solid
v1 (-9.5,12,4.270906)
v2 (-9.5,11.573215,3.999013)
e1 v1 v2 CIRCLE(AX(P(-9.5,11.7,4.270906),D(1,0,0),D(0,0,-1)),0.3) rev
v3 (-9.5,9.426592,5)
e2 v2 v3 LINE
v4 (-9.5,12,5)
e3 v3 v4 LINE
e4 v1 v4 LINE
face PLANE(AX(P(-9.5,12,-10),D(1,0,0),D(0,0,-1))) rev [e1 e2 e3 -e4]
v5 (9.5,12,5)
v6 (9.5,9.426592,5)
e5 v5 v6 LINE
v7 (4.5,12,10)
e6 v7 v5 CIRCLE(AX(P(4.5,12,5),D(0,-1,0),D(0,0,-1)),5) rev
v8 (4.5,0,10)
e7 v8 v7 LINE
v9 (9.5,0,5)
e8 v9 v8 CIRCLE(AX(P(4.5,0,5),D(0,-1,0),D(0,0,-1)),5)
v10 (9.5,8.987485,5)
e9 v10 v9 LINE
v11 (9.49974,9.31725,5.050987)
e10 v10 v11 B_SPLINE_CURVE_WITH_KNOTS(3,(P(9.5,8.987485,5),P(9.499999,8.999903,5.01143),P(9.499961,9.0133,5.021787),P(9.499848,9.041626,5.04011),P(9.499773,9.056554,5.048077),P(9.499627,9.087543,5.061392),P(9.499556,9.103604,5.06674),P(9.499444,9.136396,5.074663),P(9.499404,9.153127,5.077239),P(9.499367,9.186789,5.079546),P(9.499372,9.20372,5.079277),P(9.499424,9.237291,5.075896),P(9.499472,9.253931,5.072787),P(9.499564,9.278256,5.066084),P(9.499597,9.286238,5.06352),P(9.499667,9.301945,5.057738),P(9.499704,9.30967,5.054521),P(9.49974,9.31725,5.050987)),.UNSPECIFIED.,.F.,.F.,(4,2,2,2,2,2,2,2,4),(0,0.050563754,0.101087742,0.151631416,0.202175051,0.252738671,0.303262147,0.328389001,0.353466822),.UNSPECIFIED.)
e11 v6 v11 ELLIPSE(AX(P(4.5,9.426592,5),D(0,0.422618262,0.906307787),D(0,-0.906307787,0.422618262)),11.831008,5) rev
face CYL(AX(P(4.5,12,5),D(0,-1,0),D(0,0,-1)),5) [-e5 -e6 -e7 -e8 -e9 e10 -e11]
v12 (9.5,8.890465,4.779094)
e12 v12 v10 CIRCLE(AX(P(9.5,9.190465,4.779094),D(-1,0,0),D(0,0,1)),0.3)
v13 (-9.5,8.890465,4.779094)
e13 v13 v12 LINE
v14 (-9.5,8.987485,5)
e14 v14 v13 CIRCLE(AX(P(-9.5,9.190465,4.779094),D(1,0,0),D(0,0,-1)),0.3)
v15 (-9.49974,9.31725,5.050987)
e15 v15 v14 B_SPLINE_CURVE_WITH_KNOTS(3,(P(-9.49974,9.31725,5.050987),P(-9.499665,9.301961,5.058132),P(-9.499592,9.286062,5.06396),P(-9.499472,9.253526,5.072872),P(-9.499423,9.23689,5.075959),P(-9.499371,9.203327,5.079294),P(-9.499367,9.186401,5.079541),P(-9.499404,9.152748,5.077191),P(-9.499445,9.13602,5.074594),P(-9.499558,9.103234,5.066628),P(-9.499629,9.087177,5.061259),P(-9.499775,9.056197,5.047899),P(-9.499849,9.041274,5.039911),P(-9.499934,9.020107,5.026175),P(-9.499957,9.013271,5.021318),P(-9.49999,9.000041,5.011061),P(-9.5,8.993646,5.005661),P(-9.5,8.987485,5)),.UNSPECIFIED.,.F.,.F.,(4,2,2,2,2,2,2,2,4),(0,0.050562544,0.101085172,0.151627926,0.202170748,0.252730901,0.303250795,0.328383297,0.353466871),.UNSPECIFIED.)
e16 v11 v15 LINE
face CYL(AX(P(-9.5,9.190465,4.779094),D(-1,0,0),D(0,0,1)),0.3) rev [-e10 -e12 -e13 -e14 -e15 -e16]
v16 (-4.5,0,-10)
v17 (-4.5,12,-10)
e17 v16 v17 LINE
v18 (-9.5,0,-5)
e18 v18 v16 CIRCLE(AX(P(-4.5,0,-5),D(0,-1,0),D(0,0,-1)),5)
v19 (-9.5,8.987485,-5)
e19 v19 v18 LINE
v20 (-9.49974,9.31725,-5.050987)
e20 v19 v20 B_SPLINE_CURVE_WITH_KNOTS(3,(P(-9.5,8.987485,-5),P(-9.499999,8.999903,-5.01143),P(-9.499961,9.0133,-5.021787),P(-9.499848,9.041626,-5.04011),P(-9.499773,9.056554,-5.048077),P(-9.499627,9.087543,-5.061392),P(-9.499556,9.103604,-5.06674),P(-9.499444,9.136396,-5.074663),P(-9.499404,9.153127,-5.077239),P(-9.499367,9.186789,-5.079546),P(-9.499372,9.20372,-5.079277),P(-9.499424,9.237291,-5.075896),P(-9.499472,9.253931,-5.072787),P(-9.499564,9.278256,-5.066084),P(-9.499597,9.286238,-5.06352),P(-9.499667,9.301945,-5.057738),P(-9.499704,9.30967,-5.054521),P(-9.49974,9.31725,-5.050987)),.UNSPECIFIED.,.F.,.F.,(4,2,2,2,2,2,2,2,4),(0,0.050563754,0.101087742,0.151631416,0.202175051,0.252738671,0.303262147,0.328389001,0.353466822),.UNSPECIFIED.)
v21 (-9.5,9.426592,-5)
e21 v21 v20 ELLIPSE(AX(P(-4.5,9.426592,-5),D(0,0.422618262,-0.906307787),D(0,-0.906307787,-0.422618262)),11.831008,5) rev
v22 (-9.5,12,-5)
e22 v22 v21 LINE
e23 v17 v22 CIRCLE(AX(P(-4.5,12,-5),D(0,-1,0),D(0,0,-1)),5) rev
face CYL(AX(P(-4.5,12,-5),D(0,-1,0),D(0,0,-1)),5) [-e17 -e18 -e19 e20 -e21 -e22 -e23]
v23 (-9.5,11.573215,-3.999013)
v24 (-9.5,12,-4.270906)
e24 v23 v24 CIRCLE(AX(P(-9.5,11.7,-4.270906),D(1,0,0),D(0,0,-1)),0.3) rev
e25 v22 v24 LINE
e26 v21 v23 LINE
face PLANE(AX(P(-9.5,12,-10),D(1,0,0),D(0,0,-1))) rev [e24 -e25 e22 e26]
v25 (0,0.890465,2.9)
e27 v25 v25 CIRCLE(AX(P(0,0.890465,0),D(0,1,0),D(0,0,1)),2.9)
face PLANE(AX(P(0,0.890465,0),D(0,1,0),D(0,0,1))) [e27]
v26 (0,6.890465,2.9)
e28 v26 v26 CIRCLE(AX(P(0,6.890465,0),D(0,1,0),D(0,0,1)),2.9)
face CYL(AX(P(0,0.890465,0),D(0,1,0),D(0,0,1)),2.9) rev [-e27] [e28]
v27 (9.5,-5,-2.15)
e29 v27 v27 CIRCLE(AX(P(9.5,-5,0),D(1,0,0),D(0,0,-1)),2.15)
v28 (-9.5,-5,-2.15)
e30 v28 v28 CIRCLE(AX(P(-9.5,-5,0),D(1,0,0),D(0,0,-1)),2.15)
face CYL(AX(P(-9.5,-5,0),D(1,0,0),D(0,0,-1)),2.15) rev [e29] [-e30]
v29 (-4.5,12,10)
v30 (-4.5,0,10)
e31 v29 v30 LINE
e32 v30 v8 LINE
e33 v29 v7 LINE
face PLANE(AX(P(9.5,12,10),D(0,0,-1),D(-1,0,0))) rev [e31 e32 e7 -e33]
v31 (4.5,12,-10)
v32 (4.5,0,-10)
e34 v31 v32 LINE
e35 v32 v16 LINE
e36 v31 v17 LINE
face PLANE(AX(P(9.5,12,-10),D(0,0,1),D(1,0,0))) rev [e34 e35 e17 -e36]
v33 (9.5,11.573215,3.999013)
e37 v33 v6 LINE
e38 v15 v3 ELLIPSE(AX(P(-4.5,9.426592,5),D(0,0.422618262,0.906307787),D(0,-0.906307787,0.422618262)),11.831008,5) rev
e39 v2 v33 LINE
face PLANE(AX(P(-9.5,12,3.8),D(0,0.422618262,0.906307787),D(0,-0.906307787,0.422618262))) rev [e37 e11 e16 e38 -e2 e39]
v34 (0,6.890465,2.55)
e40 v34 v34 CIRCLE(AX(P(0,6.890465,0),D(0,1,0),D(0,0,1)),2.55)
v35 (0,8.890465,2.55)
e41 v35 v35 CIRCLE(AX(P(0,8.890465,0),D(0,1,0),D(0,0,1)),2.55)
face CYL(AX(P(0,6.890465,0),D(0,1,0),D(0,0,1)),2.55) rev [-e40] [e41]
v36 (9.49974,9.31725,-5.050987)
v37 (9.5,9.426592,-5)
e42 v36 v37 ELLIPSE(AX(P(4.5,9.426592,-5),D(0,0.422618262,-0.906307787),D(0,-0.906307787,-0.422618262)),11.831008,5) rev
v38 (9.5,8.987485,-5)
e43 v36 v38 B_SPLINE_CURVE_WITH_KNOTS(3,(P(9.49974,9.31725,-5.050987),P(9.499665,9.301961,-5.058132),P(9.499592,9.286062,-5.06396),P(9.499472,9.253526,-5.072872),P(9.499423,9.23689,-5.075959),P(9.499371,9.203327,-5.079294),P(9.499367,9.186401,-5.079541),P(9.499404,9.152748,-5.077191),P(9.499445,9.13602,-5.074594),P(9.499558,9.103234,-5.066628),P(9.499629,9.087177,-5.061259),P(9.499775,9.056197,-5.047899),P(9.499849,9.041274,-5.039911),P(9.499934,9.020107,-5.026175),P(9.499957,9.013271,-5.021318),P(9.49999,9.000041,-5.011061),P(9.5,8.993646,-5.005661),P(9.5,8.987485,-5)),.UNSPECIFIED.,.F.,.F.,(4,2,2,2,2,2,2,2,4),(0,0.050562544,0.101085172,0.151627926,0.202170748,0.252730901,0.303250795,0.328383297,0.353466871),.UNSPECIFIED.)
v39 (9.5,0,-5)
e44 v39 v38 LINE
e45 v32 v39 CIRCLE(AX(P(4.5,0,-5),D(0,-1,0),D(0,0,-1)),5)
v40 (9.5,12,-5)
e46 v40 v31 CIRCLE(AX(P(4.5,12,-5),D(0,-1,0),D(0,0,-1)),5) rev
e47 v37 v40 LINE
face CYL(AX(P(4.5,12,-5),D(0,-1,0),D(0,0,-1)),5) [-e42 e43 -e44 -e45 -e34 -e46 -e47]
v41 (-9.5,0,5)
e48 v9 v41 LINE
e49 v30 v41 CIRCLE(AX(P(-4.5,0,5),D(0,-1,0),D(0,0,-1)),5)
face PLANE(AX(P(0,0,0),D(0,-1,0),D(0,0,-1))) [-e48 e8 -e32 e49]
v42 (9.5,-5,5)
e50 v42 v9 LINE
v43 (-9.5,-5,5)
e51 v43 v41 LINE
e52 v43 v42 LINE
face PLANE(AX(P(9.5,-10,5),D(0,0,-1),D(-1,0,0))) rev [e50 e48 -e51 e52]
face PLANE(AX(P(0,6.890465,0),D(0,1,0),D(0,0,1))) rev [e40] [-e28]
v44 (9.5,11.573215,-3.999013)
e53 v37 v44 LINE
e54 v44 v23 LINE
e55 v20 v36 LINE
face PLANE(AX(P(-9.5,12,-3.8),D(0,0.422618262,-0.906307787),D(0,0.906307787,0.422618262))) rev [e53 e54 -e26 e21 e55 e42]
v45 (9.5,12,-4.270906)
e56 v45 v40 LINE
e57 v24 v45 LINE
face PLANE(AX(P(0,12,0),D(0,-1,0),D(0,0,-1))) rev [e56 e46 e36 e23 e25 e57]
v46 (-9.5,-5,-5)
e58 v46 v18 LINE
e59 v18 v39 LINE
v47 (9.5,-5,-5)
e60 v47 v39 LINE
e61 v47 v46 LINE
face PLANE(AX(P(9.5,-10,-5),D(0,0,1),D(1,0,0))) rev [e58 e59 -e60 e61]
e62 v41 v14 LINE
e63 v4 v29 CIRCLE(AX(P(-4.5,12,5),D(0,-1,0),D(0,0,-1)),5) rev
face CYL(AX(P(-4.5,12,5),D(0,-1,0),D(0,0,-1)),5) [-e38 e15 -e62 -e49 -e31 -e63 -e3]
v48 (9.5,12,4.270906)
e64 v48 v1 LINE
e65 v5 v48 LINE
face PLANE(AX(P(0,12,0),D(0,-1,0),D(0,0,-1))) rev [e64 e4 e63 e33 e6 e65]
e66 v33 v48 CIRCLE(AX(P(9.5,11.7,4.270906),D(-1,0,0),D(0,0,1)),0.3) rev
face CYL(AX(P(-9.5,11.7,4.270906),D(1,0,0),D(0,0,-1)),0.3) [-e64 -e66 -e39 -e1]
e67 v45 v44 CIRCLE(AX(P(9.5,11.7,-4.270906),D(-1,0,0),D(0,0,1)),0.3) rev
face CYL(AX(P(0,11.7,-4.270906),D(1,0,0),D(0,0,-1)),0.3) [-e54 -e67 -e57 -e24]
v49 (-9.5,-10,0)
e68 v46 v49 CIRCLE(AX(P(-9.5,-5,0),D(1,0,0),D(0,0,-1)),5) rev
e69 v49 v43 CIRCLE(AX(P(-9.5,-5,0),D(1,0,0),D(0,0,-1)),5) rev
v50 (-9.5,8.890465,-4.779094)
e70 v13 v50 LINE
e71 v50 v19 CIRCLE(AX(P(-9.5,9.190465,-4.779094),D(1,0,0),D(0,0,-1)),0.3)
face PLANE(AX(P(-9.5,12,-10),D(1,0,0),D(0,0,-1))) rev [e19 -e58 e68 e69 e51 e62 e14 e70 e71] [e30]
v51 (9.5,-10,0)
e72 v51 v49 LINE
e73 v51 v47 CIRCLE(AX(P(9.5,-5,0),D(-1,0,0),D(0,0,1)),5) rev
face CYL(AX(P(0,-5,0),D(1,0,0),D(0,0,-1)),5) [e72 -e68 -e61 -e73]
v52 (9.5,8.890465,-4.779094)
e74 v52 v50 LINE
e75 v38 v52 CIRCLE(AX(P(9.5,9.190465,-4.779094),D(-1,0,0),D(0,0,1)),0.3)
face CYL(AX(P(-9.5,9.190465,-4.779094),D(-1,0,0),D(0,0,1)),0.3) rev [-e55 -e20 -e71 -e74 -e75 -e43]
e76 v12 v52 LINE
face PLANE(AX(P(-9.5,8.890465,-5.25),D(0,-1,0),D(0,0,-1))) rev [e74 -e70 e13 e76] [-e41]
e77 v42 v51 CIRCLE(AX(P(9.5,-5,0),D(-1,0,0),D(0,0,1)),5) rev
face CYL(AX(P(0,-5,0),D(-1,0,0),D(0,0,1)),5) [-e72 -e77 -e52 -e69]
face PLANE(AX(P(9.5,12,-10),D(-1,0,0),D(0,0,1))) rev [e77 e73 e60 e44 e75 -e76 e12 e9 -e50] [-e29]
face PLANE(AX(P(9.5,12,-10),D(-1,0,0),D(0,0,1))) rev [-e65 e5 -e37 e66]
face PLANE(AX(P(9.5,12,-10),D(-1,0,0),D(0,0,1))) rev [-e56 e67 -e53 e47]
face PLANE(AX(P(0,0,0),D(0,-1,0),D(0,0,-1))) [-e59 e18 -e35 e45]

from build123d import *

# Parameters (mm, degrees)
SKETCH2_W           = 19
SKETCH2_H           = 20
BOSS_EXTRUDE1_DEPTH = 12
CUT_EXTRUDE1_DEPTH  = 25.596747752
FILLET1_R           = 5
FILLET2_R           = 0.3
SKETCH4_R           = 2.55
CUT_EXTRUDE2_DEPTH  = 2
SKETCH5_R           = 2.9
CUT_EXTRUDE3_DEPTH  = 6
SKETCH6_W           = 19
SKETCH6_H           = 10
BOSS_EXTRUDE2_DEPTH = 10
SKETCH7_R           = 2.15
CUT_EXTRUDE4_DEPTH  = 25.596747919
FILLET3_R           = 5


# Some blends are built 0.0001 mm under size
with BuildPart() as part:
    # Sketch2 → Boss-Extrude1 (new body)
    with BuildSketch(Plane(origin=(0, 0, 0), x_dir=(1, 0, 0), z_dir=(0, 1, 0))):
        Rectangle(SKETCH2_W, SKETCH2_H)
    extrude(amount=BOSS_EXTRUDE1_DEPTH)

    # Sketch3 → Cut-Extrude1 (cut, through all)
    with BuildSketch(Plane(origin=(9.5, 0, 0), x_dir=(0, 0, -1), z_dir=(1, 0, 0))):
        Polygon((-3.8, 12), (3.8, 12), (5.25, 8.890464965), (-5.25, 8.890464965), align=None)
    extrude(amount=-CUT_EXTRUDE1_DEPTH, mode=Mode.SUBTRACT)

    # Fillet1
    # the kernel refuses this fillet: 5 mm, written as the material it takes off along each edge
    with BuildSketch(Plane(origin=(-9.5, -12.5, -10), x_dir=(1, 0, 0), z_dir=(0, 1, 0)), Plane(origin=(-9.5, -12.5, 10), x_dir=(0, 0, -1), z_dir=(0, 1, 0))) as fillet1_piece_1:
        with BuildLine():
            CenterArc((FILLET1_R, -FILLET1_R), FILLET1_R, 90, 90)
            Line((0, -FILLET1_R), (0, 0))
            Line((0, 0), (FILLET1_R, 0))
        make_face()
    extrude(amount=37, mode=Mode.SUBTRACT)
    with BuildSketch(Plane(origin=(9.5, -12.5, -10), x_dir=(-1, 0, 0), z_dir=(0, 1, 0)), Plane(origin=(9.5, -12.5, 10), x_dir=(0, 0, -1), z_dir=(0, 1, 0))) as fillet1_piece_2:
        with BuildLine():
            CenterArc((FILLET1_R, FILLET1_R), FILLET1_R, 180, 90)
            Line((0, FILLET1_R), (0, 0))
            Line((0, 0), (FILLET1_R, 0))
        make_face()
    extrude(amount=37, mode=Mode.SUBTRACT)

    # Fillet2
    fillet2_edges = [part.edges().sort_by_distance(p)[0] for p in [
        (0, 12, 3.8),
        (0, 12, -3.8),
        (0, 8.890464965, -5.25),
        (0, 8.890464965, 5.25),
    ]]
    fillet(fillet2_edges, radius=FILLET2_R)

    # Sketch4 → Cut-Extrude2 (cut)
    with BuildSketch(Plane(origin=(0, 8.890464965, 0), x_dir=(1, 0, 0), z_dir=(0, 1, 0))):
        with Locations(Location((0, 0, 0), (0, 0, 270))):
            Circle(SKETCH4_R)
    extrude(amount=-CUT_EXTRUDE2_DEPTH, mode=Mode.SUBTRACT)

    # Sketch5 → Cut-Extrude3 (cut)
    with BuildSketch(Plane(origin=(0, 6.890464965, 0), x_dir=(1, 0, 0), z_dir=(0, 1, 0))):
        with Locations(Location((0, 0, 0), (0, 0, 270))):
            Circle(SKETCH5_R)
    extrude(amount=-CUT_EXTRUDE3_DEPTH, mode=Mode.SUBTRACT)

    # Sketch6 → Boss-Extrude2 (add)
    with BuildSketch(Plane.XZ):
        Rectangle(SKETCH6_W, SKETCH6_H)
    extrude(amount=BOSS_EXTRUDE2_DEPTH)

    # Sketch7 → Cut-Extrude4 (cut, through all)
    with BuildSketch(Plane(origin=(9.5, 0, 0), x_dir=(0, 0, -1), z_dir=(1, 0, 0))):
        with Locations((0, -5)):
            Circle(SKETCH7_R)
    extrude(amount=-CUT_EXTRUDE4_DEPTH, mode=Mode.SUBTRACT)

    # Fillet3
    fillet3_edges = [part.edges().sort_by_distance(p)[0] for p in [
        (0, -10, -5),
        (0, -10, 5),
    ]]
    fillet(fillet3_edges, radius=FILLET3_R - 0.0001)  # a hair under: the kernel refuses the full size


solid = part.part
